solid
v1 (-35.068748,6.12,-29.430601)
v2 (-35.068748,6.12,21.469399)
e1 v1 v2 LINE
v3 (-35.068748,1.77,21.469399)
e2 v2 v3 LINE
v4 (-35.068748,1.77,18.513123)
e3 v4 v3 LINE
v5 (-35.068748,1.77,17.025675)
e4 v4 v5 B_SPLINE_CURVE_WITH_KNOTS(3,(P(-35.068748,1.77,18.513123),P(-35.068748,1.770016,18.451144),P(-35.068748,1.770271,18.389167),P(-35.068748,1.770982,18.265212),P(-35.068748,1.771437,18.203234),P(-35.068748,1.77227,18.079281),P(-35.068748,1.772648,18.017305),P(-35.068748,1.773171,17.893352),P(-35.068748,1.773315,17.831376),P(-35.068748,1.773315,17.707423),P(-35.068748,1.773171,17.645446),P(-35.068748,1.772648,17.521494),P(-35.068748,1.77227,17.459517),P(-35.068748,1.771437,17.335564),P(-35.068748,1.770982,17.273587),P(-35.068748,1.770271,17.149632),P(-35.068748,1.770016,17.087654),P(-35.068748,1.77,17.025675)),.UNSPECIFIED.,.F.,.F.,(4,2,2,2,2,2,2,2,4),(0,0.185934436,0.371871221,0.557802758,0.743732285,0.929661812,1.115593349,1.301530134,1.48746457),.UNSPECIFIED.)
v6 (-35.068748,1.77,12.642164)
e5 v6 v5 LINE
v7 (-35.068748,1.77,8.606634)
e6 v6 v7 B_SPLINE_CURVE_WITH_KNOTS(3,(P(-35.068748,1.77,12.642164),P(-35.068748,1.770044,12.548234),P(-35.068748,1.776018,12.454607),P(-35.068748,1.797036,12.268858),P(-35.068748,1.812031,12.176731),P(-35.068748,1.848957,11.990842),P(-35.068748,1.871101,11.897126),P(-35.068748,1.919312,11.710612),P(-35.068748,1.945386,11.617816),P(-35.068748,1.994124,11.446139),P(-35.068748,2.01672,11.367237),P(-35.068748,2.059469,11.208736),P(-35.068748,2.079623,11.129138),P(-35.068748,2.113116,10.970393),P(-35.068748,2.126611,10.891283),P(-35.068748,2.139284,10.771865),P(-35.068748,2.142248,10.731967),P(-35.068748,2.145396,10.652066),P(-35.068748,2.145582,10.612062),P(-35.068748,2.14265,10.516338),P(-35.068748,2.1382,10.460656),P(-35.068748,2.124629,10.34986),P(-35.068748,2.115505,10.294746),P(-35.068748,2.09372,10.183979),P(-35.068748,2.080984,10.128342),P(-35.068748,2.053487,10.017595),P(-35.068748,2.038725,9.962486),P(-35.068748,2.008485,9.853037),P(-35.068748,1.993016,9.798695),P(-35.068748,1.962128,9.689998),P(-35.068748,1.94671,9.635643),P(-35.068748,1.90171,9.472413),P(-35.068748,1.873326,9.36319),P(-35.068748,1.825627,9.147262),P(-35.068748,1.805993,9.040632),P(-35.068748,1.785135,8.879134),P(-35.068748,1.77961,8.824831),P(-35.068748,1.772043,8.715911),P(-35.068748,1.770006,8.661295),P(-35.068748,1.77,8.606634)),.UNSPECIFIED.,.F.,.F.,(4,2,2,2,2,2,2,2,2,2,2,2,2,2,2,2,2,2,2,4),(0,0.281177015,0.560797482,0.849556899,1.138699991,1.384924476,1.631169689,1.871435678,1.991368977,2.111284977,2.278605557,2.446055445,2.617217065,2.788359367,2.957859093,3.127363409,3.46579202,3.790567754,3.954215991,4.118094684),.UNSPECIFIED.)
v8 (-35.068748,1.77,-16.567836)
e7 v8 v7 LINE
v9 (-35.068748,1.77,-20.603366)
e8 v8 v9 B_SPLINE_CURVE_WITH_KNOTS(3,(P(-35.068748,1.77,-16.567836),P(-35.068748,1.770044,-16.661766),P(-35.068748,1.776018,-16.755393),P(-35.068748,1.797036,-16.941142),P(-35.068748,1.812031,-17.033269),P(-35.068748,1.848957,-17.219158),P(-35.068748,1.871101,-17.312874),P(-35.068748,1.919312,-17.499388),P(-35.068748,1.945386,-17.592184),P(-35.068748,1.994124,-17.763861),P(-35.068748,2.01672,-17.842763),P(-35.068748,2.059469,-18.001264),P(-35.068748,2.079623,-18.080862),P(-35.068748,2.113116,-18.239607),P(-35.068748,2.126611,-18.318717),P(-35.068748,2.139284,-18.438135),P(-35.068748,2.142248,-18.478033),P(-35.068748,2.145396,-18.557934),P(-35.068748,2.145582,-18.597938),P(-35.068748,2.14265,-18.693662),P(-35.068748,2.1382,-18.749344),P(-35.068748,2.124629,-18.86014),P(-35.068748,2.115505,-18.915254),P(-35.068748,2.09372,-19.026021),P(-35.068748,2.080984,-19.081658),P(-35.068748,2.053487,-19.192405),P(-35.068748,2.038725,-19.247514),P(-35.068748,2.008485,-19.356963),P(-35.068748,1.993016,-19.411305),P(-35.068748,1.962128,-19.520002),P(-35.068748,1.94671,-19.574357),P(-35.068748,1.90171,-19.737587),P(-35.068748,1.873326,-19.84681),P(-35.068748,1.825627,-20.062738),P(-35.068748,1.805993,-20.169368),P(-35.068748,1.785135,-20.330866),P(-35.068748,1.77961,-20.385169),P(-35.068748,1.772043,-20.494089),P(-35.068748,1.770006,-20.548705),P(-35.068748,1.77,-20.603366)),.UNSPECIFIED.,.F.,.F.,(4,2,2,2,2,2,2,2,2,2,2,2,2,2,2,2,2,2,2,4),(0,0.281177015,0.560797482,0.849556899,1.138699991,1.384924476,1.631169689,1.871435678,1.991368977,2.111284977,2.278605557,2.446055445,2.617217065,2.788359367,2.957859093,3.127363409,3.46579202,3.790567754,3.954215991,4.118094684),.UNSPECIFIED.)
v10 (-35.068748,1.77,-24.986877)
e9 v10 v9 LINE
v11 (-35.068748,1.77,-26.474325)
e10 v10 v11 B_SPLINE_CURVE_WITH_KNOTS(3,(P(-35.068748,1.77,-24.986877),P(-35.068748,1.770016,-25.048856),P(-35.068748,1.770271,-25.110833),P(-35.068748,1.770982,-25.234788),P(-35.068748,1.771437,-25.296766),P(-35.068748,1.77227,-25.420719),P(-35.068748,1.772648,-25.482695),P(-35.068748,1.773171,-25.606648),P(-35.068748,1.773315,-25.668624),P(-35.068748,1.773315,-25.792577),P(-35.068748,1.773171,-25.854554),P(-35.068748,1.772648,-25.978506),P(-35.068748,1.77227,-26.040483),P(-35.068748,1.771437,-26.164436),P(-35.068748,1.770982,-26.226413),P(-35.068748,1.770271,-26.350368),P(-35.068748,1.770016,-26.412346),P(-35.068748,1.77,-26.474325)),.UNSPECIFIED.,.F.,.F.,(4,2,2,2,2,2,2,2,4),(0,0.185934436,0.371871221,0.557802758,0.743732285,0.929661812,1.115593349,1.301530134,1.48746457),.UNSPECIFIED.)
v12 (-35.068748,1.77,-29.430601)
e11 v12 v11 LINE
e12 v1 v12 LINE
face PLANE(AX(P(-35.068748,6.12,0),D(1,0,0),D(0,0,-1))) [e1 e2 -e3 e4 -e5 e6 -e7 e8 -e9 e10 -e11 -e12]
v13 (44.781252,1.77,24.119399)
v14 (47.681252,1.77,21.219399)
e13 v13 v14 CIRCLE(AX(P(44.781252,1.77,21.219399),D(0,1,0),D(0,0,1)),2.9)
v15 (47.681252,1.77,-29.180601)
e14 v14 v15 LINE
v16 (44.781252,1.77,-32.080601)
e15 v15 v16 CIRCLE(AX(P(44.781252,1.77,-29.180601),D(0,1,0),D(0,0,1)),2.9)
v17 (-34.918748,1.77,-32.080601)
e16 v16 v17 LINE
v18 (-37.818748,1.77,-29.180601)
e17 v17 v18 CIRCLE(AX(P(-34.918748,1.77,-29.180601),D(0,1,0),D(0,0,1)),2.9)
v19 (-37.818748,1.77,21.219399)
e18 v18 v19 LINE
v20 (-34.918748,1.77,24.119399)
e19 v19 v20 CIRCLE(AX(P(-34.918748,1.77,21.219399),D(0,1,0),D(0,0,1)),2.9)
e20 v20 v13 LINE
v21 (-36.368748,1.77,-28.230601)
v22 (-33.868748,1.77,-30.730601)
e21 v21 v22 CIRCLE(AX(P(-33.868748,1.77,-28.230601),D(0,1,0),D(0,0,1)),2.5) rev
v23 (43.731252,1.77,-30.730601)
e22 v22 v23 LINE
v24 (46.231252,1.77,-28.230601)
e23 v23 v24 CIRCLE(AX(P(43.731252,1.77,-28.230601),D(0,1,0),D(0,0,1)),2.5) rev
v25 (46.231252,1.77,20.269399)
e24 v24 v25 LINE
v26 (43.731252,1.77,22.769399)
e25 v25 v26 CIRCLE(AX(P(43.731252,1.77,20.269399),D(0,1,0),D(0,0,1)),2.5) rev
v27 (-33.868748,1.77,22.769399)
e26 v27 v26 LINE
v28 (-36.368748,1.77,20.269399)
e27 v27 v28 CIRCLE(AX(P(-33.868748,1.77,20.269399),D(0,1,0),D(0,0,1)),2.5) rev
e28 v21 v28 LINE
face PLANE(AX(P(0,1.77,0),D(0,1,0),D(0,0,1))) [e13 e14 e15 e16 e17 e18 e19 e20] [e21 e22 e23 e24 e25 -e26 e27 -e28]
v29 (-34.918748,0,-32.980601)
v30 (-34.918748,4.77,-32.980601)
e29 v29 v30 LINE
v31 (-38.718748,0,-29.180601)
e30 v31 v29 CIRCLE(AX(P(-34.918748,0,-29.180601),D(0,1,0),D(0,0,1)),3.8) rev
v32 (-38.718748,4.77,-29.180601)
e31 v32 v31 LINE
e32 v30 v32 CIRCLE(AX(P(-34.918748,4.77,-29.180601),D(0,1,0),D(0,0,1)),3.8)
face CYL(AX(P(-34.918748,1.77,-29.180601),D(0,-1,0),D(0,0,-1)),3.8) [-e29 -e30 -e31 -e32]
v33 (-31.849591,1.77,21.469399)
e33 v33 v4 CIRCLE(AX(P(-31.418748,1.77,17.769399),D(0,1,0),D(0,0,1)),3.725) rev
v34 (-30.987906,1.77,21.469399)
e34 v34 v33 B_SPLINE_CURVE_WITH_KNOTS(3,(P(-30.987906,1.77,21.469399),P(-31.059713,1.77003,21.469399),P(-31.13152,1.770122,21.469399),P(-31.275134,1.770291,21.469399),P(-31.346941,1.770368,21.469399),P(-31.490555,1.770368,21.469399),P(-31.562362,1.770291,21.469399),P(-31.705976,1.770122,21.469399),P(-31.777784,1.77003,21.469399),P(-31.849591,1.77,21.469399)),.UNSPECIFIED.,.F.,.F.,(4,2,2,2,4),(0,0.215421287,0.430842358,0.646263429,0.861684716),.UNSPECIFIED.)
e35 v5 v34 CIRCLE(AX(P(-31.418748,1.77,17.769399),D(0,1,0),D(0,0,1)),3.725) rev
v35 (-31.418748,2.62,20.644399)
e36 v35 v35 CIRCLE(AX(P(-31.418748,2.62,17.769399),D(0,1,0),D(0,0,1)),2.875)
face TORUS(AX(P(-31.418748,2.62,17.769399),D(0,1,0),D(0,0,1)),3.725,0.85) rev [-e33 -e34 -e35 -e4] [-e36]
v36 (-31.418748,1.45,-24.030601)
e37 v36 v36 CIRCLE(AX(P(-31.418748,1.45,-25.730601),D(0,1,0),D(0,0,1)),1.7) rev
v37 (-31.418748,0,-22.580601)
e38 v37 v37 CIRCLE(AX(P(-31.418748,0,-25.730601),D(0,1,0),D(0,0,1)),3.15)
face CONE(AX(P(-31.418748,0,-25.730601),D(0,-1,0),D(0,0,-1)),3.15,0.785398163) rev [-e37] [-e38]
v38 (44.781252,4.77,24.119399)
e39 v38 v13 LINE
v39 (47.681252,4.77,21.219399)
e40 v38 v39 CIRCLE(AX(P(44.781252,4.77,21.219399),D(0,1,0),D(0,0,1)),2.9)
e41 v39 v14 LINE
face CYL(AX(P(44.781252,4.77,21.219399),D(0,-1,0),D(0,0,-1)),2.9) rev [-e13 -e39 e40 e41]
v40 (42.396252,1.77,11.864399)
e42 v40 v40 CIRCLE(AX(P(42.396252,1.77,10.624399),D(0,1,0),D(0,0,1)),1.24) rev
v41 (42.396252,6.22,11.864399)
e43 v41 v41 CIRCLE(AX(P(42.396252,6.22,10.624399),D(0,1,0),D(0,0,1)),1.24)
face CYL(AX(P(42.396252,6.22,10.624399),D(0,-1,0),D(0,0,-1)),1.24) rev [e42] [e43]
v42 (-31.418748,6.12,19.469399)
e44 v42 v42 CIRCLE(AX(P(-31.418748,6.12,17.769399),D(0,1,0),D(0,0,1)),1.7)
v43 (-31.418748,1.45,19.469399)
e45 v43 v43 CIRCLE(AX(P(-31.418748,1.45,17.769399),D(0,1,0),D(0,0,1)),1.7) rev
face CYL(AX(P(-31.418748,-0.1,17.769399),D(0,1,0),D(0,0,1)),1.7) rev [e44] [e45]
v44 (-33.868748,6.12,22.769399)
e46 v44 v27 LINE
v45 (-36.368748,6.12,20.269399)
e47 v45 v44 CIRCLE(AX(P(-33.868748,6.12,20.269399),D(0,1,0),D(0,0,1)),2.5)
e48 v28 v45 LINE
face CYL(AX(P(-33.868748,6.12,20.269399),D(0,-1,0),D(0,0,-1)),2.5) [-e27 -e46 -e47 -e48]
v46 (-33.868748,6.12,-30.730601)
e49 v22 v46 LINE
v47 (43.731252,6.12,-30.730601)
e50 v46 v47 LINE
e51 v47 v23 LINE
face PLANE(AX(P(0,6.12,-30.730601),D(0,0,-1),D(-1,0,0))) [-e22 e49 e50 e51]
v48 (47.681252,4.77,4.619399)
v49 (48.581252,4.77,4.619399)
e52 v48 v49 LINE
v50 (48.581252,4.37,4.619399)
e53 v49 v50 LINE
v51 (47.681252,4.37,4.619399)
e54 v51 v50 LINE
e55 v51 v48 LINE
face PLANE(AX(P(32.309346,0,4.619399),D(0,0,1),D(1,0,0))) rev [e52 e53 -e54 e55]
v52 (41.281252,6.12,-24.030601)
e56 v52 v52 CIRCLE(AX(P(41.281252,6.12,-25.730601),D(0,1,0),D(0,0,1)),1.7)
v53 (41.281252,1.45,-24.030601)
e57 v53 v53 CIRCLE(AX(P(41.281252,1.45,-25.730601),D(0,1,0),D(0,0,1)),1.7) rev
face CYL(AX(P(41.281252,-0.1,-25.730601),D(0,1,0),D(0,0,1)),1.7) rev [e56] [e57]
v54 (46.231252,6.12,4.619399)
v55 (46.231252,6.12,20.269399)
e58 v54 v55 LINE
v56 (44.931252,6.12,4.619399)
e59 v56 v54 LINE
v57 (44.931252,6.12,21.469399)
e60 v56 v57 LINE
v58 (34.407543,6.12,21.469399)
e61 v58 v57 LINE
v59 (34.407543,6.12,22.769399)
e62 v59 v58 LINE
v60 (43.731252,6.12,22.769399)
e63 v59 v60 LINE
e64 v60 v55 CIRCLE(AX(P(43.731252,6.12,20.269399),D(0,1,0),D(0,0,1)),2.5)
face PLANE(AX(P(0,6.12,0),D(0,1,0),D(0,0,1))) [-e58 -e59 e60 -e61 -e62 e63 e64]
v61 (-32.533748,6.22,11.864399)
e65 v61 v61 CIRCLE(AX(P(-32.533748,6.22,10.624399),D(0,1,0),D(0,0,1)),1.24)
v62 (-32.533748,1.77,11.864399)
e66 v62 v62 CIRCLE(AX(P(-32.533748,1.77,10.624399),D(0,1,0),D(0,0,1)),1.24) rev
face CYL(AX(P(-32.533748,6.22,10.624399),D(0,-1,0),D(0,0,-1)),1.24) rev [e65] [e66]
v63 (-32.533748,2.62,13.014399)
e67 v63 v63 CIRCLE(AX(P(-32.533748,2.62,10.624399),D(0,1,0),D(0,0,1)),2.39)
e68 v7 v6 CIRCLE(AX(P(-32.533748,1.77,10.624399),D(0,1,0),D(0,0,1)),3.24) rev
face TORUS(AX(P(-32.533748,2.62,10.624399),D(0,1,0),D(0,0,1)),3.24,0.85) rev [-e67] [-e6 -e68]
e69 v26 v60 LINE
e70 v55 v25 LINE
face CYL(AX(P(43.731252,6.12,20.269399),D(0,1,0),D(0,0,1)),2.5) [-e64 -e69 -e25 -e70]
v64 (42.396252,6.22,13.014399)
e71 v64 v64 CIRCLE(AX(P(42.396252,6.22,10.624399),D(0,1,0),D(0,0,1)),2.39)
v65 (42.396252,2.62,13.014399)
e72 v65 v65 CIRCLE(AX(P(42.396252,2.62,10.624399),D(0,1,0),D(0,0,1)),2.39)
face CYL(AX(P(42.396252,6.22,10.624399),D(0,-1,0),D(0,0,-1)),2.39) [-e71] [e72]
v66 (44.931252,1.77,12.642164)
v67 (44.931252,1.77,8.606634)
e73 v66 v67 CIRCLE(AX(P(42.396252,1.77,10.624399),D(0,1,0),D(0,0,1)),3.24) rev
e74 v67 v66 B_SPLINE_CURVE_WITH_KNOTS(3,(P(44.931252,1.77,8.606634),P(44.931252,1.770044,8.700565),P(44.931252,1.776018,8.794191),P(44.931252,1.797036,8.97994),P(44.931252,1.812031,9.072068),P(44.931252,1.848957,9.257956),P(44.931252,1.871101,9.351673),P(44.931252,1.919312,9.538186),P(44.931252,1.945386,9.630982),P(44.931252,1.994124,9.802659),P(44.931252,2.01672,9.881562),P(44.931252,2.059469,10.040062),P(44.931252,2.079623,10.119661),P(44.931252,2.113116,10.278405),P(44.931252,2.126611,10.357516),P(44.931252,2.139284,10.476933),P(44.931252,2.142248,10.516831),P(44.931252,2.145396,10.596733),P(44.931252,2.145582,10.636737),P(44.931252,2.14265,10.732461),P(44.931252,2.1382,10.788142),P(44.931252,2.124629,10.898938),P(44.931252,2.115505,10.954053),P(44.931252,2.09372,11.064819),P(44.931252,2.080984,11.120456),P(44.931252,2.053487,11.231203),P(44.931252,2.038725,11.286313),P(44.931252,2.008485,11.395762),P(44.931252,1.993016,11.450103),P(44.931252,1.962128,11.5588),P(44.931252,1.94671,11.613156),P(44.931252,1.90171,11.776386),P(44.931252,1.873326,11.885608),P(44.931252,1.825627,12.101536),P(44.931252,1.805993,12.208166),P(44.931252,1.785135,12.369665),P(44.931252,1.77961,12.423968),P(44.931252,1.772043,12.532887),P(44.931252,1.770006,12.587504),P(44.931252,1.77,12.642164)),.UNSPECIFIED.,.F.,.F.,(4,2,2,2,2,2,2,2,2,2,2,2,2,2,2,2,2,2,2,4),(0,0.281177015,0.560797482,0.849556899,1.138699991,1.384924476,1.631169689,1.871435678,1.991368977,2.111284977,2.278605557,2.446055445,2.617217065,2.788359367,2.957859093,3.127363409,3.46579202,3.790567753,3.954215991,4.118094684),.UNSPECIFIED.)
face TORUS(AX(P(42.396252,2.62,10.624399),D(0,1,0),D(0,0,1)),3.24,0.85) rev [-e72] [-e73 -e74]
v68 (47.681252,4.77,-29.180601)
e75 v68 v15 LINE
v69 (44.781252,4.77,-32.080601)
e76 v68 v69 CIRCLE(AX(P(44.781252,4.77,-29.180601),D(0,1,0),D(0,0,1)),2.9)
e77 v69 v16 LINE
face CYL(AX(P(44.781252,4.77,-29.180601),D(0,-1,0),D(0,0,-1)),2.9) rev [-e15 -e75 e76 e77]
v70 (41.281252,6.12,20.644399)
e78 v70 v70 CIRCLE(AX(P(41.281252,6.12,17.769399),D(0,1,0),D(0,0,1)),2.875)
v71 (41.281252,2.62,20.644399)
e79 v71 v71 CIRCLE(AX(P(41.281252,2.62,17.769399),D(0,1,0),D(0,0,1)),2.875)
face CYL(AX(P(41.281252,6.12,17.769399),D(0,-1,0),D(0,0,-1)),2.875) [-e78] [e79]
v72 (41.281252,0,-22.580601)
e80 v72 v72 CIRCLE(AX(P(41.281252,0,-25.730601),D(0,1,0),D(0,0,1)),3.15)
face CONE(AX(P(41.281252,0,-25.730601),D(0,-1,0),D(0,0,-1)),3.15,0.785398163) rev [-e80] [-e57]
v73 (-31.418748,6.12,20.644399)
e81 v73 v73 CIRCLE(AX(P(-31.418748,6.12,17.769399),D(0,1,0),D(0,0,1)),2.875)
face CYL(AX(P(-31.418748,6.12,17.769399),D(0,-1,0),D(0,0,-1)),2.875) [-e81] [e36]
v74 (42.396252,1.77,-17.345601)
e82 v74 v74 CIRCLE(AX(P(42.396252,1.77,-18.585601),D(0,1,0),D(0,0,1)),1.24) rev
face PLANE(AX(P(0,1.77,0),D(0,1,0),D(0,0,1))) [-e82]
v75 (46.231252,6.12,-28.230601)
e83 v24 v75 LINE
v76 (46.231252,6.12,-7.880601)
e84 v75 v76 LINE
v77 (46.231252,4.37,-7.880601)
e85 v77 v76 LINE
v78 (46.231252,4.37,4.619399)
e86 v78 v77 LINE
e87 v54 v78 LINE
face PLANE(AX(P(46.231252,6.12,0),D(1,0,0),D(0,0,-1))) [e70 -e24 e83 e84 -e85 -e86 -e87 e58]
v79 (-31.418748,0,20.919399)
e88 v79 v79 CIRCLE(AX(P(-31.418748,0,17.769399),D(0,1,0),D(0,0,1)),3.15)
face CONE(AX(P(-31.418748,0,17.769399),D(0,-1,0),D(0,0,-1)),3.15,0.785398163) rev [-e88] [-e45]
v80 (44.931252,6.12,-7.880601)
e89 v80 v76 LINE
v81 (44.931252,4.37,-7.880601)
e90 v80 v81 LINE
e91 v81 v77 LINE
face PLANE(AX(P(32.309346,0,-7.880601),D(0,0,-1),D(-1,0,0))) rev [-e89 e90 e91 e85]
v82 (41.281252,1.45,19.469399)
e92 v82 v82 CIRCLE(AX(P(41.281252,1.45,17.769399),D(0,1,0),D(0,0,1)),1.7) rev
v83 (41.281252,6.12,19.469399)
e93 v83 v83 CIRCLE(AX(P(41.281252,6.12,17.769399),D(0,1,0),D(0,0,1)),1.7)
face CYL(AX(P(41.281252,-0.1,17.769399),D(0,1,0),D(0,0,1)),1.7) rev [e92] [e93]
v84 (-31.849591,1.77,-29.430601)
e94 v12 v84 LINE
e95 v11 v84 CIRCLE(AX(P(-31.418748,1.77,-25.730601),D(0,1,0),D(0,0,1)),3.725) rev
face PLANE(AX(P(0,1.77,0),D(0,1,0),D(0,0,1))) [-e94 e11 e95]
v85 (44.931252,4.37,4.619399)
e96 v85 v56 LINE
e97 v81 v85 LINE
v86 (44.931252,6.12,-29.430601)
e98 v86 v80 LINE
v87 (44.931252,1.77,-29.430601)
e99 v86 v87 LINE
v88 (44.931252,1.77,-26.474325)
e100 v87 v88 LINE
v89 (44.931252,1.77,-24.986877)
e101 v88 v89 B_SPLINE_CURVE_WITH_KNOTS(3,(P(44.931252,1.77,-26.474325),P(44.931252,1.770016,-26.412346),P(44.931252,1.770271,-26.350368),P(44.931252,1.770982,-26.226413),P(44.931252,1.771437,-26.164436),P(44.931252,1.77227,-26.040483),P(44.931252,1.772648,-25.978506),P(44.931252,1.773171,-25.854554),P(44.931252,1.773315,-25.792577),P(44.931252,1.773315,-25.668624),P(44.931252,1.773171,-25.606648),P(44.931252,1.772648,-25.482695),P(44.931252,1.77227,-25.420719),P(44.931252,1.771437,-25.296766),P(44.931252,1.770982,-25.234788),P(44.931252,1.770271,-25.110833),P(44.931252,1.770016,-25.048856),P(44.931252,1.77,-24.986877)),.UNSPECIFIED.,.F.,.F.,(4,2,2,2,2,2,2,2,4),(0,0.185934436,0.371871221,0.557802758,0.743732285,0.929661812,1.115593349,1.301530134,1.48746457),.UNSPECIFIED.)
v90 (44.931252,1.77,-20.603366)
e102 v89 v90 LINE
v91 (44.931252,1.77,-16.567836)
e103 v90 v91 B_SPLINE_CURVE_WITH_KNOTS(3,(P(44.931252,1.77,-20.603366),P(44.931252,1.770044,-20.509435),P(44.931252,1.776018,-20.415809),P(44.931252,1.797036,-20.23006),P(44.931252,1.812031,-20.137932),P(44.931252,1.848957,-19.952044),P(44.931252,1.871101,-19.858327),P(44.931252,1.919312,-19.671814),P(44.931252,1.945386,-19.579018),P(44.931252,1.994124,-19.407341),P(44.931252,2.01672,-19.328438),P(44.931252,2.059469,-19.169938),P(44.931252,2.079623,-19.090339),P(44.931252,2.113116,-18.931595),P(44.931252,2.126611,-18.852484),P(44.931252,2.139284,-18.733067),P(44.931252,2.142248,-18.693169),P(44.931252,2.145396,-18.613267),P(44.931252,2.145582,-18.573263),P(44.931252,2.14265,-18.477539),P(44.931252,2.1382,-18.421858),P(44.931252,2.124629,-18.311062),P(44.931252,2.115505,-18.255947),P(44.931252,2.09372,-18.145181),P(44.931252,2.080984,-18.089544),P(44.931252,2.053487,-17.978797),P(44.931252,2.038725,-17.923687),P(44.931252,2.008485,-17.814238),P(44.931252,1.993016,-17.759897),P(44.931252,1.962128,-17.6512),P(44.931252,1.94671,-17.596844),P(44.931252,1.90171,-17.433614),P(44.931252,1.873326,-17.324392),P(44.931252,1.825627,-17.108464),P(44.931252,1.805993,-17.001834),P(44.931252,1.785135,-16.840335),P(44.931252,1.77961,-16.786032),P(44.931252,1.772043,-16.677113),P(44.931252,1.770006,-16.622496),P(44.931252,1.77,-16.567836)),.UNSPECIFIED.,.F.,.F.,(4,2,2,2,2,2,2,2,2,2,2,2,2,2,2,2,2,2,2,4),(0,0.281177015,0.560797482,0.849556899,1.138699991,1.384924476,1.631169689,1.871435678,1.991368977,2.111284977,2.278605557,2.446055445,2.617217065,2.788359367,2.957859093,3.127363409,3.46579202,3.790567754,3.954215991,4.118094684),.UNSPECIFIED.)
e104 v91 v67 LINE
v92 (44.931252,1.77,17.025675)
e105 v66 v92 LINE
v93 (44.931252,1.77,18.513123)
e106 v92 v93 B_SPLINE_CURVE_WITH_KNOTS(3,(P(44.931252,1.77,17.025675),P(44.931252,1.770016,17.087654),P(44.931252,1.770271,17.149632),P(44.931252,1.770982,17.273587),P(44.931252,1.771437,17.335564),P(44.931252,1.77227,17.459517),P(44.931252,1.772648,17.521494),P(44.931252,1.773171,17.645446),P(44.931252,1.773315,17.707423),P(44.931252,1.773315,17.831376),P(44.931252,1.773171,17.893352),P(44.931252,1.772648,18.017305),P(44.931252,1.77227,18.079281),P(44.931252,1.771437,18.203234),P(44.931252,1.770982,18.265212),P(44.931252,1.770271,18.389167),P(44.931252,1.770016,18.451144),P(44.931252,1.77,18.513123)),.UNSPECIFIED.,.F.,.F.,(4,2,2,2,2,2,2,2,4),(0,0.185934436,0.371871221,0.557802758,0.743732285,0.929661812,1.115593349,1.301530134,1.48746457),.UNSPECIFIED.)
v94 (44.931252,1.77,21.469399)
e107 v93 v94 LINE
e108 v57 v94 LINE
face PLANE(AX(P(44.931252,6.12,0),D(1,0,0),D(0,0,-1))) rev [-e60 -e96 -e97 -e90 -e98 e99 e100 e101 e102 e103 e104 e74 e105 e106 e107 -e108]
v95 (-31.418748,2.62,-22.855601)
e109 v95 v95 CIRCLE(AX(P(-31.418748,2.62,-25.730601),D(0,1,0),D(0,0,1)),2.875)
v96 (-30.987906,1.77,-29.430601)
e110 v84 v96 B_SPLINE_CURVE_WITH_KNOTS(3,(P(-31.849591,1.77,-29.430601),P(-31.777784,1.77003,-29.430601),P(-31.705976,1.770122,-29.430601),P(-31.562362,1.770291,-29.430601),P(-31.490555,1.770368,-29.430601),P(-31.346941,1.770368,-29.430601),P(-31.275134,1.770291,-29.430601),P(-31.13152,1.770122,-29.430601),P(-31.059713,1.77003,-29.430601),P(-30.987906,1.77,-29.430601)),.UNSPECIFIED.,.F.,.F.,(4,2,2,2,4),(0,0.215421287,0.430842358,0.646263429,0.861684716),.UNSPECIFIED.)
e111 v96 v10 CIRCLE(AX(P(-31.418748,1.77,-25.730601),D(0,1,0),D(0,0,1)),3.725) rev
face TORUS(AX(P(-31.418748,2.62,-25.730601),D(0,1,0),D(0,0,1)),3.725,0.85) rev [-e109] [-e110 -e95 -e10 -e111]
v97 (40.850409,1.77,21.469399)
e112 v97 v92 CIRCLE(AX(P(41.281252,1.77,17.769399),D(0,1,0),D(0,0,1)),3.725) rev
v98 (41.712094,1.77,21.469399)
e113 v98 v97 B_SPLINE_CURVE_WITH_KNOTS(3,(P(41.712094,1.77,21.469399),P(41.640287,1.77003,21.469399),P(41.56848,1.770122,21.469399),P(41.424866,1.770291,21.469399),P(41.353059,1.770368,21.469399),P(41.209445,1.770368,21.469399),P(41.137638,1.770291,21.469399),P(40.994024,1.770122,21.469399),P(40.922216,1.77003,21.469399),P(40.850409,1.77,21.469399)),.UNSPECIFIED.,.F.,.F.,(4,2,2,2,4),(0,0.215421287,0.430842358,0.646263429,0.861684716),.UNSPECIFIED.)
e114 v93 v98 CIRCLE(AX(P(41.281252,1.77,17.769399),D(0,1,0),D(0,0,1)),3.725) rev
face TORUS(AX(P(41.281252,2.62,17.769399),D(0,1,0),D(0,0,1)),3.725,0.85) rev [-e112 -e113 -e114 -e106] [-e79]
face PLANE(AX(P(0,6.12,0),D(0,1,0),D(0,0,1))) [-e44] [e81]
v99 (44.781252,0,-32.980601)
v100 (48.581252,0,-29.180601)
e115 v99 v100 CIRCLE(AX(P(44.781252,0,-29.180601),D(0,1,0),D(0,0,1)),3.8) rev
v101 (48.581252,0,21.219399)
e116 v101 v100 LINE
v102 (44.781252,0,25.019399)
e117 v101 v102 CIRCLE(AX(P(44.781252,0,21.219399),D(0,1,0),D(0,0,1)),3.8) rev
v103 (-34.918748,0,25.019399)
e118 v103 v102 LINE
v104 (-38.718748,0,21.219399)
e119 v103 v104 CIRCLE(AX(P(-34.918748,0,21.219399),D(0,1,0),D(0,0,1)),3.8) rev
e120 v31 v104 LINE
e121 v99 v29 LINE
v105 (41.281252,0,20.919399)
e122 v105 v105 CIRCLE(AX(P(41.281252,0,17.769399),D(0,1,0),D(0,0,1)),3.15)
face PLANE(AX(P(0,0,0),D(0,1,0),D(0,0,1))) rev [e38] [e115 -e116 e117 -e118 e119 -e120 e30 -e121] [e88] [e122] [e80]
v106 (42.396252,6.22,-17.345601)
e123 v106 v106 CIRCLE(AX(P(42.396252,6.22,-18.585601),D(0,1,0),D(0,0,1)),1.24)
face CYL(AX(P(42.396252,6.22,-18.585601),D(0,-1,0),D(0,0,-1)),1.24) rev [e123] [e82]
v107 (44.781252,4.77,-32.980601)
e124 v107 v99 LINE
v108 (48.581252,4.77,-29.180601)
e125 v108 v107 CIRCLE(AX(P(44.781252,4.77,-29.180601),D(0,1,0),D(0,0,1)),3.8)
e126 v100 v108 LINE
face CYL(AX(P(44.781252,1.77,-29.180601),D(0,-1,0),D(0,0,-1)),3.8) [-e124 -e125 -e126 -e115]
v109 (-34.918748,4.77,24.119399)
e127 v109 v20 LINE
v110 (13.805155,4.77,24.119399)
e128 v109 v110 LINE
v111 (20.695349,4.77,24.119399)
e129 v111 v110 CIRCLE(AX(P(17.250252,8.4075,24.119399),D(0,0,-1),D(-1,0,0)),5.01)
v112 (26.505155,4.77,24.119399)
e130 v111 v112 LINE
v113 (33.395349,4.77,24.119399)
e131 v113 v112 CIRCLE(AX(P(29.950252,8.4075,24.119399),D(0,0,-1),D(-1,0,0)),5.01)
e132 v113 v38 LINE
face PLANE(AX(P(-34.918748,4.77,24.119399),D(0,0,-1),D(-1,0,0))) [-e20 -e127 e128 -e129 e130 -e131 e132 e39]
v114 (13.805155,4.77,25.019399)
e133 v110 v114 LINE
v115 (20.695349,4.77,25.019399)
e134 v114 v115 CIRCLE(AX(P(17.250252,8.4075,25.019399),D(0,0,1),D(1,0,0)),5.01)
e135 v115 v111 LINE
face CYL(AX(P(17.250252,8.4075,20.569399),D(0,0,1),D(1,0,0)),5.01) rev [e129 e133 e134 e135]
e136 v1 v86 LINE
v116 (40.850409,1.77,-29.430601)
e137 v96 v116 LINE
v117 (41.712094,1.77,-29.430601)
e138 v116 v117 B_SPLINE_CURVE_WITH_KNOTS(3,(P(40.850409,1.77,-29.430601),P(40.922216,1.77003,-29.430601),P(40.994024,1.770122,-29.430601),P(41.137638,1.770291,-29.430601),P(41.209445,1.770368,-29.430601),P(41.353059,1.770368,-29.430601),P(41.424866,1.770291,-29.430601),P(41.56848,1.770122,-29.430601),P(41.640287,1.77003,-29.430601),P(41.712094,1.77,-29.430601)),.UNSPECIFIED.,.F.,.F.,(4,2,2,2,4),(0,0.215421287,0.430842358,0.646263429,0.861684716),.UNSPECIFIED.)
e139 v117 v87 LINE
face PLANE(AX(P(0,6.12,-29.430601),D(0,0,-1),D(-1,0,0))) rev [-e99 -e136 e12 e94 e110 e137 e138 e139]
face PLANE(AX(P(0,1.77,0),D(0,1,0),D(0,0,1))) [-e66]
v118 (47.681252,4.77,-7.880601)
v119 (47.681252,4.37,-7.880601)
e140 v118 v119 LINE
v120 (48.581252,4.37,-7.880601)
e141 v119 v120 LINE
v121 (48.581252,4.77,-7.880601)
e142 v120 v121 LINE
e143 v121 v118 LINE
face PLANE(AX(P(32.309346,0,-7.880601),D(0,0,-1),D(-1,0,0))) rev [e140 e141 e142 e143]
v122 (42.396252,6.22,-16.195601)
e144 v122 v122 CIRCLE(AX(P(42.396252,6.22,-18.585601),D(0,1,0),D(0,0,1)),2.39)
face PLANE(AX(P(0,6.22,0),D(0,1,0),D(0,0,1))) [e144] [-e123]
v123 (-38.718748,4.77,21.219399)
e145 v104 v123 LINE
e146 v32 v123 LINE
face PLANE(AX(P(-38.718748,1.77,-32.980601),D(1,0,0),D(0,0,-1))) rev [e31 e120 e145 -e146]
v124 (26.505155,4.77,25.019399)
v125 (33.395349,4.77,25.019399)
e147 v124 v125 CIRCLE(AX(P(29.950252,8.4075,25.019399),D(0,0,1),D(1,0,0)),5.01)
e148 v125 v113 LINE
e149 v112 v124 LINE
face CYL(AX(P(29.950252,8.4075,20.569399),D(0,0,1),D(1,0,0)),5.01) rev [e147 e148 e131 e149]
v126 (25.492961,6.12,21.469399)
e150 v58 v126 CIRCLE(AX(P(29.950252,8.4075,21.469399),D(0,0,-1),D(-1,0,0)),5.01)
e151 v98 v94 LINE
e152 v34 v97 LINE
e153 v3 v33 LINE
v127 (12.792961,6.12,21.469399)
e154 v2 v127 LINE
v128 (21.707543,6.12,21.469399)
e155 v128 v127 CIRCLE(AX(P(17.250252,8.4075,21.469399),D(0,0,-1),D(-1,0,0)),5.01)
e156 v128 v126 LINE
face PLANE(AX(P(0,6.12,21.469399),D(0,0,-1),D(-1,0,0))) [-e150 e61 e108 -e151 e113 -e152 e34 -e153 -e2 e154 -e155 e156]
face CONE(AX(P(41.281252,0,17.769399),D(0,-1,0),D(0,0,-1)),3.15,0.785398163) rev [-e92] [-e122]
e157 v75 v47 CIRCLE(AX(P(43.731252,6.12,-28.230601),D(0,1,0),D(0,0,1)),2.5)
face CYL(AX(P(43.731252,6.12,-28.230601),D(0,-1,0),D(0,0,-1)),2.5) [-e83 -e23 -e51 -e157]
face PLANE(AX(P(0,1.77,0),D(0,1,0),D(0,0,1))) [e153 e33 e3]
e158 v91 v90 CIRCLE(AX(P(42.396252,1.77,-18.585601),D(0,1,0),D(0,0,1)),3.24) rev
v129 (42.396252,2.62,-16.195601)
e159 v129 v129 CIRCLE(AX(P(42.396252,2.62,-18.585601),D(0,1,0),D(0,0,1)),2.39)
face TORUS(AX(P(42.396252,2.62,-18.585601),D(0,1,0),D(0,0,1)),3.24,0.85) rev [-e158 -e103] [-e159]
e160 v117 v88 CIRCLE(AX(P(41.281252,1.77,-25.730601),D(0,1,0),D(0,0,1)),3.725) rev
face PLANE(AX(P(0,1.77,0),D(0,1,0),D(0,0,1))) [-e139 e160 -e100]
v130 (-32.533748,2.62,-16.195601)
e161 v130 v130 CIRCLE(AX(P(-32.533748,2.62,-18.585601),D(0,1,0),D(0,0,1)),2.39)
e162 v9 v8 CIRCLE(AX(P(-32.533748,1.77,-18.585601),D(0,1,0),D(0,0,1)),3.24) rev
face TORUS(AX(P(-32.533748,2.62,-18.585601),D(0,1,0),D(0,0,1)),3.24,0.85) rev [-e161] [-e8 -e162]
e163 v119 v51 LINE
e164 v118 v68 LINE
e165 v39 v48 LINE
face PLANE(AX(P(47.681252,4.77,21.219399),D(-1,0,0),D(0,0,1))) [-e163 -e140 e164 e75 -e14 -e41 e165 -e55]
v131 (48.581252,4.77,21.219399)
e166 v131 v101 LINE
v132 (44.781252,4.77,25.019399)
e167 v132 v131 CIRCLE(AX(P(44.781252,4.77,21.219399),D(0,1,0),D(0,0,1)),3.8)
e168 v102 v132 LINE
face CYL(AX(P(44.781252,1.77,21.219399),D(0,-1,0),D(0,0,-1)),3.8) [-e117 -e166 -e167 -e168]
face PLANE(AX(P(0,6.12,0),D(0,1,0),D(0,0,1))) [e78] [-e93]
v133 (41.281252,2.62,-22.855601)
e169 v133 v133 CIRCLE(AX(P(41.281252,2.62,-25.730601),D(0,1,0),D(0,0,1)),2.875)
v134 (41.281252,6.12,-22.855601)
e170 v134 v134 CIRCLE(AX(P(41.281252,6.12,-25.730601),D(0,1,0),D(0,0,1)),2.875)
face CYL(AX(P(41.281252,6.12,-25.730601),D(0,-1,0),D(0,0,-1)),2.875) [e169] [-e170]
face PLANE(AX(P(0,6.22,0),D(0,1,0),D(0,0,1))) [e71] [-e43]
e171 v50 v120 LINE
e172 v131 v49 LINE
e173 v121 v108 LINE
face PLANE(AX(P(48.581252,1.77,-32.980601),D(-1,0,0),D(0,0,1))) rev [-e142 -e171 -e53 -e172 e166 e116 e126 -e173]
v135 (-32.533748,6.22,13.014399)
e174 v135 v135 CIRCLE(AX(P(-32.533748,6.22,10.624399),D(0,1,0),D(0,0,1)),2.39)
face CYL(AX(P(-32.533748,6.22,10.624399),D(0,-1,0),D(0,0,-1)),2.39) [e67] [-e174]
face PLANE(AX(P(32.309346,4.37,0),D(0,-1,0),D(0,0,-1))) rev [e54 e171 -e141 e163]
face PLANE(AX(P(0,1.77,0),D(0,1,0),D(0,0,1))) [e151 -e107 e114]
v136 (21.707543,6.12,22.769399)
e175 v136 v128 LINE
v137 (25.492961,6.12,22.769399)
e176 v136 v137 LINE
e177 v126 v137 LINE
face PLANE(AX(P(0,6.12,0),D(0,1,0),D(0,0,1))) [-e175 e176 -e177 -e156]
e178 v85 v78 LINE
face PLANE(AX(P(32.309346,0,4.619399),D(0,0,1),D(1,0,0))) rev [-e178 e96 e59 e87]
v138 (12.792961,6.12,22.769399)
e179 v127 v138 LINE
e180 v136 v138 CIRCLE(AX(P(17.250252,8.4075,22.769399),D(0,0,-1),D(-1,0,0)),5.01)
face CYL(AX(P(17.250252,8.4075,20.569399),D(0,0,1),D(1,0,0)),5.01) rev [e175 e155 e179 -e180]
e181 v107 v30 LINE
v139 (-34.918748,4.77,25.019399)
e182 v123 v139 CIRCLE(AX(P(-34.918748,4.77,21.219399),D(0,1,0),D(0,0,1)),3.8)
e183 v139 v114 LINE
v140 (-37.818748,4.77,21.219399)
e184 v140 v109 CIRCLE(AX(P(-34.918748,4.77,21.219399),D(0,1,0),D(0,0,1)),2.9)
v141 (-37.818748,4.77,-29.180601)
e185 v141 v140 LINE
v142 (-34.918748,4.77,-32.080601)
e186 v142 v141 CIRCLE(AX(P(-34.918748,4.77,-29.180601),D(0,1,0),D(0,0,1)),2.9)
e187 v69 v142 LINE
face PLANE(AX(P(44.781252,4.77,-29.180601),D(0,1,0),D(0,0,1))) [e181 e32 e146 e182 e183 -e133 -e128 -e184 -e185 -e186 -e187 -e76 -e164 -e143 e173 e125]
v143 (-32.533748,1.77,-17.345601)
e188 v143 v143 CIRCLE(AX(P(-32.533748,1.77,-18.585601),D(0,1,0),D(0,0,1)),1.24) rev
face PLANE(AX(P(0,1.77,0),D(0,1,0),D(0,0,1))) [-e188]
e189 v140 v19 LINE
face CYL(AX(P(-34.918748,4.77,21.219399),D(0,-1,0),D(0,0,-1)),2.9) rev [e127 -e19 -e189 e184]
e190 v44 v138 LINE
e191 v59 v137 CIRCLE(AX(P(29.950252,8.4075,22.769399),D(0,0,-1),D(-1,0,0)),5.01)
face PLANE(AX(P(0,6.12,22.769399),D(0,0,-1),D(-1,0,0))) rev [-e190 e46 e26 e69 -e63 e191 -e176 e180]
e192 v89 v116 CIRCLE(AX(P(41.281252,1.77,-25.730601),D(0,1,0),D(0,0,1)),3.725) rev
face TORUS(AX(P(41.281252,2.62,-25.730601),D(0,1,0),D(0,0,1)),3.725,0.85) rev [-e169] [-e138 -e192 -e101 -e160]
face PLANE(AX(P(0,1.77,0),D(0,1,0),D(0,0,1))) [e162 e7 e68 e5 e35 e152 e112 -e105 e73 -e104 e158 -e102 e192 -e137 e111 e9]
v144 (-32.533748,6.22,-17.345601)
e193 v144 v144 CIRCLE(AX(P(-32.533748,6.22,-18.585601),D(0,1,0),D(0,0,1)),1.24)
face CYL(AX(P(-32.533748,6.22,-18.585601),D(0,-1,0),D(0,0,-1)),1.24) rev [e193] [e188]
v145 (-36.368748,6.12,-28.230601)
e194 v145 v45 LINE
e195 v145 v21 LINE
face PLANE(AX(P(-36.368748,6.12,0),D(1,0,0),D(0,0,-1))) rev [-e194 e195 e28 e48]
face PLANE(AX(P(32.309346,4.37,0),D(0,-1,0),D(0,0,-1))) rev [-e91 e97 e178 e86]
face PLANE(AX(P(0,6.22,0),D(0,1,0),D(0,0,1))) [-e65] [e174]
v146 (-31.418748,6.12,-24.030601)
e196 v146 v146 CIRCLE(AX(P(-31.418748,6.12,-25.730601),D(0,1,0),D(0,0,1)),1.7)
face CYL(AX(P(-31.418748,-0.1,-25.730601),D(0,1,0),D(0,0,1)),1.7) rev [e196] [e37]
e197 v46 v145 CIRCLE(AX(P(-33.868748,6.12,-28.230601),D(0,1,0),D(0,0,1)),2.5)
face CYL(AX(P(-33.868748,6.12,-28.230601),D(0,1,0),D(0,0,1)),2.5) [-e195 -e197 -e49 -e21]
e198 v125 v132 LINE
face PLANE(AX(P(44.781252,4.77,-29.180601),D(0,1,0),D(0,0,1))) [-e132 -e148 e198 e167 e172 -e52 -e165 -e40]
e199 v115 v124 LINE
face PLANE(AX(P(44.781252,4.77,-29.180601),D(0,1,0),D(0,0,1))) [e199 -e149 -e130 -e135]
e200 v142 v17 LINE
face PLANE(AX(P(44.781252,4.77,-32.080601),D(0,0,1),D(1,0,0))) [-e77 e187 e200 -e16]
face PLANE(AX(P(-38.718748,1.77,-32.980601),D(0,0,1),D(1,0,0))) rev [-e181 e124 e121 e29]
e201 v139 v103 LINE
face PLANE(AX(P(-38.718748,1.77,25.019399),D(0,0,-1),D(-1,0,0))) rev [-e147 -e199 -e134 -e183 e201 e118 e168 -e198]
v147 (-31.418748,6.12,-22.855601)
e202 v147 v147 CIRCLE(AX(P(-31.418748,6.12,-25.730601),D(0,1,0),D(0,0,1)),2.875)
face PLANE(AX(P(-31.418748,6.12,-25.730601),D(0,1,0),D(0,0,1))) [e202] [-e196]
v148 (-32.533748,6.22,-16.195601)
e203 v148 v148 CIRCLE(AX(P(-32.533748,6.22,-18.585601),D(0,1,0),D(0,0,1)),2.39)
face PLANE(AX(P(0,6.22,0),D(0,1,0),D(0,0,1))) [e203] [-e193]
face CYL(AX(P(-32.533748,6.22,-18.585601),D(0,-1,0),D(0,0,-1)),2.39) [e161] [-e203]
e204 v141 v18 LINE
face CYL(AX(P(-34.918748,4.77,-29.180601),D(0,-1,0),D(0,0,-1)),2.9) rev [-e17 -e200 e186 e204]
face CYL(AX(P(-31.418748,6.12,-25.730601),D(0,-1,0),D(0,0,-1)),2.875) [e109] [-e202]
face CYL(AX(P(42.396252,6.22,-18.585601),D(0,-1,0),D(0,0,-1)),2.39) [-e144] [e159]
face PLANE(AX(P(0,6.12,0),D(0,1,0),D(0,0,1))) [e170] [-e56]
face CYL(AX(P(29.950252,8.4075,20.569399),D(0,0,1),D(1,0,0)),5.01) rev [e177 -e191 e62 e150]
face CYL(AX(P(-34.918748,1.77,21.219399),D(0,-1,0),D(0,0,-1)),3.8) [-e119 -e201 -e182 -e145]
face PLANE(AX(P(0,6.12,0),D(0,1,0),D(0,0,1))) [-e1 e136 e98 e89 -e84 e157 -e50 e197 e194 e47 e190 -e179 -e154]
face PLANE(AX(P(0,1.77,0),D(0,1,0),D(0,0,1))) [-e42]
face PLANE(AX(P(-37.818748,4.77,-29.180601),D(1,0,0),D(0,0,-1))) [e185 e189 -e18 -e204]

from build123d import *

# Parameters (mm, degrees)
SKETCH1_W           = 87.3
SKETCH1_H           = 58
BOSS_EXTRUDE1_DEPTH = 1.77
FILLET1_R           = 3.8
BOSS_EXTRUDE2_START = 3
BOSS_EXTRUDE2_DEPTH = 3
SKETCH3_W           = 82.6
SKETCH3_H           = 53.5
SKETCH3_W_2         = 80
SKETCH3_H_2         = 50.9
BOSS_EXTRUDE3_DEPTH = 4.35
FILLET2_R           = 2.5
SKETCH4_R           = 2.875
BOSS_EXTRUDE4_DEPTH = 4.35
SKETCH5_R           = 1.7
CUT_EXTRUDE1_DEPTH  = 6.22
CHAMFER1_SIZE       = 1.45
SKETCH6_R           = 2.39
SKETCH6_R_2         = 1.24
BOSS_EXTRUDE5_DEPTH = 4.45
FILLET3_R           = 0.85
SKETCH7_R           = 5.01
CUT_EXTRUDE2_DEPTH  = 4.45
CUT_EXTRUDE3_REACH  = 95.529
SKETCH8_W           = 7.6
SKETCH8_H           = 1.35
SKETCH8_H_2         = 0.4
SKETCH8_W_2         = 1
SKETCH8_W_3         = 3.9


with BuildPart() as part:
    # Sketch1 → Boss-Extrude1 (new body)
    with BuildSketch(Plane(origin=(0, 0, 0), x_dir=(1, 0, 0), z_dir=(0, 1, 0))):
        with Locations((4.931251627, 3.980600764)):
            Rectangle(SKETCH1_W, SKETCH1_H)
    extrude(amount=BOSS_EXTRUDE1_DEPTH)

    # Fillet1
    fillet1_edges = [part.edges().sort_by_distance(p)[0] for p in [
        (-38.718748373, 0.885, -32.980600764),
        (48.581251627, 0.885, -32.980600764),
        (48.581251627, 0.885, 25.019399236),
        (-38.718748373, 0.885, 25.019399236),
    ]]
    fillet(fillet1_edges, radius=FILLET1_R)

    # Sketch2 → Boss-Extrude2 (add)
    with BuildSketch(Plane(origin=(0, 1.77, 0), x_dir=(1, 0, 0), z_dir=(0, 1, 0)).offset(BOSS_EXTRUDE2_START)):
        with BuildLine():
            Line((44.781251627, 32.980600764), (-34.918748373, 32.980600764))
            ThreePointArc((-34.918748373, 32.980600764), (-37.605754141, 31.867606533), (-38.718748373, 29.180600764))
            Line((-38.718748373, 29.180600764), (-38.718748373, -21.219399236))
            ThreePointArc((-38.718748373, -21.219399236), (-37.605754141, -23.906405004), (-34.918748373, -25.019399236))
            Line((-34.918748373, -25.019399236), (44.781251627, -25.019399236))
            ThreePointArc((44.781251627, -25.019399236), (47.468257396, -23.906405004), (48.581251627, -21.219399236))
            Line((48.581251627, -21.219399236), (48.581251627, 29.180600764))
            ThreePointArc((48.581251627, 29.180600764), (47.468257396, 31.867606533), (44.781251627, 32.980600764))
        make_face()
        with BuildLine():
            Line((47.681251627, -21.219399236), (47.681251627, 29.180600764))
            ThreePointArc((47.681251627, 29.180600764), (46.831861293, 31.231210429), (44.781251627, 32.080600764))
            Line((44.781251627, 32.080600764), (-34.918748373, 32.080600764))
            ThreePointArc((-34.918748373, 32.080600764), (-36.969358038, 31.231210429), (-37.818748373, 29.180600764))
            Line((-37.818748373, 29.180600764), (-37.818748373, -21.219399236))
            ThreePointArc((-37.818748373, -21.219399236), (-36.969358038, -23.270008901), (-34.918748373, -24.119399236))
            Line((-34.918748373, -24.119399236), (44.781251627, -24.119399236))
            ThreePointArc((44.781251627, -24.119399236), (46.831861293, -23.270008901), (47.681251627, -21.219399236))
        make_face(mode=Mode.SUBTRACT)
    extrude(amount=-BOSS_EXTRUDE2_DEPTH)

    # Sketch3 → Boss-Extrude3 (add)
    with BuildSketch(Plane(origin=(0, 1.77, 0), x_dir=(1, 0, 0), z_dir=(0, 1, 0))):
        with Locations((4.931251627, 3.980600764)):
            Rectangle(SKETCH3_W, SKETCH3_H)
        with Locations((4.931251627, 3.980600764)):
            Rectangle(SKETCH3_W_2, SKETCH3_H_2, mode=Mode.SUBTRACT)
    extrude(amount=BOSS_EXTRUDE3_DEPTH)

    # Fillet2
    fillet2_edges = [part.edges().sort_by_distance(p)[0] for p in [
        (-36.368748373, 3.945, -30.730600764),
        (-36.368748373, 3.945, 22.769399236),
        (46.231251627, 3.945, 22.769399236),
        (46.231251627, 3.945, -30.730600764),
    ]]
    fillet(fillet2_edges, radius=FILLET2_R)

    # Sketch4 → Boss-Extrude4 (add)
    with BuildSketch(Plane(origin=(0, 1.77, 0), x_dir=(1, 0, 0), z_dir=(0, 1, 0))):
        with Locations(Location((-31.418748373, -17.769399236, 0), (0, 0, 270))):
            Circle(SKETCH4_R)
        with Locations(Location((41.281251627, -17.769399236, 0), (0, 0, 270))):
            Circle(SKETCH4_R)
        with Locations(Location((41.281251627, 25.730600764, 0), (0, 0, 270))):
            Circle(SKETCH4_R)
        with Locations(Location((-31.418748373, 25.730600764, 0), (0, 0, 270))):
            Circle(SKETCH4_R)
    extrude(amount=BOSS_EXTRUDE4_DEPTH)

    # Sketch5 → Cut-Extrude1 (cut)
    with BuildSketch(Plane(origin=(0, 6.12, 0), x_dir=(1, 0, 0), z_dir=(0, 1, 0))):
        with Locations(Location((-31.418748373, 25.730600764, 0), (0, 0, 270))):
            Circle(SKETCH5_R)
        with Locations(Location((41.281251627, 25.730600764, 0), (0, 0, 270))):
            Circle(SKETCH5_R)
        with Locations(Location((-31.418748373, -17.769399236, 0), (0, 0, 270))):
            Circle(SKETCH5_R)
        with Locations(Location((41.281251627, -17.769399236, 0), (0, 0, 270))):
            Circle(SKETCH5_R)
    extrude(amount=-CUT_EXTRUDE1_DEPTH, mode=Mode.SUBTRACT)

    # Chamfer1
    chamfer1_edges = [part.edges().sort_by_distance(p)[0] for p in [
        (-31.418748373, 0, -27.430600764),
        (41.281251627, 0, -27.430600764),
        (-31.418748373, 0, 16.069399236),
        (41.281251627, 0, 16.069399236),
    ]]
    chamfer(chamfer1_edges, length=CHAMFER1_SIZE)

    # Sketch6 → Boss-Extrude5 (add)
    # profile 1 of 4: a face of its own
    with BuildSketch(Plane(origin=(0, 1.77, 0), x_dir=(1, 0, 0), z_dir=(0, 1, 0))):
        with Locations(Location((-32.533748373, -10.624399236, 0), (0, 0, 270))):
            Circle(SKETCH6_R)
        with Locations(Location((-32.533748373, -10.624399236, 0), (0, 0, 270))):
            Circle(SKETCH6_R_2, mode=Mode.SUBTRACT)
    # profile 2 of 4: a face of its own
    with BuildSketch(Plane(origin=(0, 1.77, 0), x_dir=(1, 0, 0), z_dir=(0, 1, 0))):
        with Locations(Location((42.396251627, -10.624399236, 0), (0, 0, 270))):
            Circle(SKETCH6_R)
        with Locations(Location((42.396251627, -10.624399236, 0), (0, 0, 270))):
            Circle(SKETCH6_R_2, mode=Mode.SUBTRACT)
    # profile 3 of 4: a face of its own
    with BuildSketch(Plane(origin=(0, 1.77, 0), x_dir=(1, 0, 0), z_dir=(0, 1, 0))):
        with Locations(Location((42.396251627, 18.585600764, 0), (0, 0, 270))):
            Circle(SKETCH6_R)
        with Locations(Location((42.396251627, 18.585600764, 0), (0, 0, 270))):
            Circle(SKETCH6_R_2, mode=Mode.SUBTRACT)
    # profile 4 of 4: a face of its own
    with BuildSketch(Plane(origin=(0, 1.77, 0), x_dir=(1, 0, 0), z_dir=(0, 1, 0))):
        with Locations(Location((-32.533748373, 18.585600764, 0), (0, 0, 270))):
            Circle(SKETCH6_R)
        with Locations(Location((-32.533748373, 18.585600764, 0), (0, 0, 270))):
            Circle(SKETCH6_R_2, mode=Mode.SUBTRACT)
    extrude(amount=BOSS_EXTRUDE5_DEPTH)

    # Fillet3
    # the kernel refuses this fillet: 0.85 mm, written as the material it adds along each edge
    with BuildSketch(Plane(origin=(-31.418748373, 1.77, 17.769399236), x_dir=(0, 0, 1), z_dir=(-1, 0, 0))) as fillet3_piece_1:
        with BuildLine():
            CenterArc((2.875 + FILLET3_R, FILLET3_R), FILLET3_R, 180, 90)
            Line((2.875 + FILLET3_R, 0), (2.875, 0))
            Line((2.875, 0), (2.875, FILLET3_R))
        make_face()
    revolve(axis=Axis((-31.418748373, 1.77, 17.769399236), (0, 1, 0)))
    with BuildSketch(Plane(origin=(41.281251627, 1.77, 17.769399236), x_dir=(0, 0, 1), z_dir=(-1, 0, 0))) as fillet3_piece_2:
        with BuildLine():
            CenterArc((2.875 + FILLET3_R, FILLET3_R), FILLET3_R, 180, 90)
            Line((2.875 + FILLET3_R, 0), (2.875, 0))
            Line((2.875, 0), (2.875, FILLET3_R))
        make_face()
    revolve(axis=Axis((41.281251627, 1.77, 17.769399236), (0, 1, 0)))
    with BuildSketch(Plane(origin=(41.281251627, 1.77, -25.730600764), x_dir=(0, 0, 1), z_dir=(-1, 0, 0))) as fillet3_piece_3:
        with BuildLine():
            CenterArc((2.875 + FILLET3_R, FILLET3_R), FILLET3_R, 180, 90)
            Line((2.875 + FILLET3_R, 0), (2.875, 0))
            Line((2.875, 0), (2.875, FILLET3_R))
        make_face()
    revolve(axis=Axis((41.281251627, 1.77, -25.730600764), (0, 1, 0)))
    with BuildSketch(Plane(origin=(-31.418748373, 1.77, -25.730600764), x_dir=(0, 0, 1), z_dir=(-1, 0, 0))) as fillet3_piece_4:
        with BuildLine():
            CenterArc((2.875 + FILLET3_R, FILLET3_R), FILLET3_R, 180, 90)
            Line((2.875 + FILLET3_R, 0), (2.875, 0))
            Line((2.875, 0), (2.875, FILLET3_R))
        make_face()
    revolve(axis=Axis((-31.418748373, 1.77, -25.730600764), (0, 1, 0)))
    with BuildSketch(Plane(origin=(-32.533748373, 1.77, -18.585600764), x_dir=(0, 0, 1), z_dir=(-1, 0, 0))) as fillet3_piece_5:
        with BuildLine():
            CenterArc((2.39 + FILLET3_R, FILLET3_R), FILLET3_R, 180, 90)
            Line((2.39, FILLET3_R), (2.39, 0))
            Line((2.39, 0), (2.39 + FILLET3_R, 0))
        make_face()
    revolve(axis=Axis((-32.533748373, 1.77, -18.585600764), (0, 1, 0)))
    with BuildSketch(Plane(origin=(-32.533748373, 1.77, 10.624399236), x_dir=(0, 0, 1), z_dir=(-1, 0, 0))) as fillet3_piece_6:
        with BuildLine():
            CenterArc((2.39 + FILLET3_R, FILLET3_R), FILLET3_R, 180, 90)
            Line((2.39, FILLET3_R), (2.39, 0))
            Line((2.39, 0), (2.39 + FILLET3_R, 0))
        make_face()
    revolve(axis=Axis((-32.533748373, 1.77, 10.624399236), (0, 1, 0)))
    with BuildSketch(Plane(origin=(42.396251627, 1.77, -18.585600764), x_dir=(0, 0, 1), z_dir=(-1, 0, 0))) as fillet3_piece_7:
        with BuildLine():
            CenterArc((2.39 + FILLET3_R, FILLET3_R), FILLET3_R, 180, 90)
            Line((2.39, FILLET3_R), (2.39, 0))
            Line((2.39, 0), (2.39 + FILLET3_R, 0))
        make_face()
    revolve(axis=Axis((42.396251627, 1.77, -18.585600764), (0, 1, 0)))
    with BuildSketch(Plane(origin=(42.396251627, 1.77, 10.624399236), x_dir=(0, 0, 1), z_dir=(-1, 0, 0))) as fillet3_piece_8:
        with BuildLine():
            CenterArc((2.39 + FILLET3_R, FILLET3_R), FILLET3_R, 180, 90)
            Line((2.39, FILLET3_R), (2.39, 0))
            Line((2.39, 0), (2.39 + FILLET3_R, 0))
        make_face()
    revolve(axis=Axis((42.396251627, 1.77, 10.624399236), (0, 1, 0)))

    # Sketch7 → Cut-Extrude2 (cut)
    with BuildSketch(Plane.XY.offset(25.019399236)):
        with Locations((29.950251627, 8.4075)):
            Circle(SKETCH7_R)
        with Locations((17.250251627, 8.4075)):
            Circle(SKETCH7_R)
    extrude(amount=-CUT_EXTRUDE2_DEPTH, mode=Mode.SUBTRACT)

    # Cut-Extrude3: up to this face of the body (flat: up to its plane)
    cut_extrude3_end = Plane(part.part.faces().sort_by_distance((44.931251627, 3.958465336, -3.980596929))[0])
    # Sketch8 → Cut-Extrude3 (cut, up to the picked face)
    with BuildSketch(Plane(origin=(48.581251627, 0, 0), x_dir=(0, 0, -1), z_dir=(1, 0, 0)), mode=Mode.PRIVATE) as cut_extrude3_sk1:
        with Locations((-0.819399236, 5.445)):
            Rectangle(SKETCH8_W, SKETCH8_H)
    cut_extrude3_tool1 = split(extrude(cut_extrude3_sk1.sketch, amount=-CUT_EXTRUDE3_REACH, mode=Mode.PRIVATE), bisect_by=cut_extrude3_end, keep=Keep.BOTH, mode=Mode.PRIVATE)
    # Sketch8 → Cut-Extrude3 (cut, up to the picked face)
    with BuildSketch(Plane(origin=(48.581251627, 0, 0), x_dir=(0, 0, -1), z_dir=(1, 0, 0)), mode=Mode.PRIVATE) as cut_extrude3_sk2:
        with Locations((-0.819399236, 4.57)):
            Rectangle(SKETCH8_W, SKETCH8_H_2)
    cut_extrude3_tool2 = split(extrude(cut_extrude3_sk2.sketch, amount=-CUT_EXTRUDE3_REACH, mode=Mode.PRIVATE), bisect_by=cut_extrude3_end, keep=Keep.BOTH, mode=Mode.PRIVATE)
    # Sketch8 → Cut-Extrude3 (cut, up to the picked face)
    with BuildSketch(Plane(origin=(48.581251627, 0, 0), x_dir=(0, 0, -1), z_dir=(1, 0, 0)), mode=Mode.PRIVATE) as cut_extrude3_sk3:
        with Locations((3.480600764, 4.57)):
            Rectangle(SKETCH8_W_2, SKETCH8_H_2)
    cut_extrude3_tool3 = split(extrude(cut_extrude3_sk3.sketch, amount=-CUT_EXTRUDE3_REACH, mode=Mode.PRIVATE), bisect_by=cut_extrude3_end, keep=Keep.BOTH, mode=Mode.PRIVATE)
    # Sketch8 → Cut-Extrude3 (cut, up to the picked face)
    with BuildSketch(Plane(origin=(48.581251627, 0, 0), x_dir=(0, 0, -1), z_dir=(1, 0, 0)), mode=Mode.PRIVATE) as cut_extrude3_sk4:
        with Locations((3.480600764, 5.445)):
            Rectangle(SKETCH8_W_2, SKETCH8_H)
    cut_extrude3_tool4 = split(extrude(cut_extrude3_sk4.sketch, amount=-CUT_EXTRUDE3_REACH, mode=Mode.PRIVATE), bisect_by=cut_extrude3_end, keep=Keep.BOTH, mode=Mode.PRIVATE)
    # Sketch8 → Cut-Extrude3 (cut, up to the picked face)
    with BuildSketch(Plane(origin=(48.581251627, 0, 0), x_dir=(0, 0, -1), z_dir=(1, 0, 0)), mode=Mode.PRIVATE) as cut_extrude3_sk5:
        with Locations((5.930600764, 5.445)):
            Rectangle(SKETCH8_W_3, SKETCH8_H)
    cut_extrude3_tool5 = split(extrude(cut_extrude3_sk5.sketch, amount=-CUT_EXTRUDE3_REACH, mode=Mode.PRIVATE), bisect_by=cut_extrude3_end, keep=Keep.BOTH, mode=Mode.PRIVATE)
    # Sketch8 → Cut-Extrude3 (cut, up to the picked face)
    with BuildSketch(Plane(origin=(48.581251627, 0, 0), x_dir=(0, 0, -1), z_dir=(1, 0, 0)), mode=Mode.PRIVATE) as cut_extrude3_sk6:
        with Locations((5.930600764, 4.57)):
            Rectangle(SKETCH8_W_3, SKETCH8_H_2)
    cut_extrude3_tool6 = split(extrude(cut_extrude3_sk6.sketch, amount=-CUT_EXTRUDE3_REACH, mode=Mode.PRIVATE), bisect_by=cut_extrude3_end, keep=Keep.BOTH, mode=Mode.PRIVATE)
    add(cut_extrude3_tool1.solids().sort_by(Axis((48.581252, 5.445, 0.819399), (-1, 0, 0)))[0], mode=Mode.SUBTRACT)
    add(cut_extrude3_tool2.solids().sort_by(Axis((48.581252, 4.57, 0.819399), (-1, 0, 0)))[0], mode=Mode.SUBTRACT)
    add(cut_extrude3_tool3.solids().sort_by(Axis((48.581252, 4.57, -3.480601), (-1, 0, 0)))[0], mode=Mode.SUBTRACT)
    add(cut_extrude3_tool4.solids().sort_by(Axis((48.581252, 5.445, -3.480601), (-1, 0, 0)))[0], mode=Mode.SUBTRACT)
    add(cut_extrude3_tool5.solids().sort_by(Axis((48.581252, 5.445, -5.930601), (-1, 0, 0)))[0], mode=Mode.SUBTRACT)
    add(cut_extrude3_tool6.solids().sort_by(Axis((48.581252, 4.57, -5.930601), (-1, 0, 0)))[0], mode=Mode.SUBTRACT)


solid = part.part
